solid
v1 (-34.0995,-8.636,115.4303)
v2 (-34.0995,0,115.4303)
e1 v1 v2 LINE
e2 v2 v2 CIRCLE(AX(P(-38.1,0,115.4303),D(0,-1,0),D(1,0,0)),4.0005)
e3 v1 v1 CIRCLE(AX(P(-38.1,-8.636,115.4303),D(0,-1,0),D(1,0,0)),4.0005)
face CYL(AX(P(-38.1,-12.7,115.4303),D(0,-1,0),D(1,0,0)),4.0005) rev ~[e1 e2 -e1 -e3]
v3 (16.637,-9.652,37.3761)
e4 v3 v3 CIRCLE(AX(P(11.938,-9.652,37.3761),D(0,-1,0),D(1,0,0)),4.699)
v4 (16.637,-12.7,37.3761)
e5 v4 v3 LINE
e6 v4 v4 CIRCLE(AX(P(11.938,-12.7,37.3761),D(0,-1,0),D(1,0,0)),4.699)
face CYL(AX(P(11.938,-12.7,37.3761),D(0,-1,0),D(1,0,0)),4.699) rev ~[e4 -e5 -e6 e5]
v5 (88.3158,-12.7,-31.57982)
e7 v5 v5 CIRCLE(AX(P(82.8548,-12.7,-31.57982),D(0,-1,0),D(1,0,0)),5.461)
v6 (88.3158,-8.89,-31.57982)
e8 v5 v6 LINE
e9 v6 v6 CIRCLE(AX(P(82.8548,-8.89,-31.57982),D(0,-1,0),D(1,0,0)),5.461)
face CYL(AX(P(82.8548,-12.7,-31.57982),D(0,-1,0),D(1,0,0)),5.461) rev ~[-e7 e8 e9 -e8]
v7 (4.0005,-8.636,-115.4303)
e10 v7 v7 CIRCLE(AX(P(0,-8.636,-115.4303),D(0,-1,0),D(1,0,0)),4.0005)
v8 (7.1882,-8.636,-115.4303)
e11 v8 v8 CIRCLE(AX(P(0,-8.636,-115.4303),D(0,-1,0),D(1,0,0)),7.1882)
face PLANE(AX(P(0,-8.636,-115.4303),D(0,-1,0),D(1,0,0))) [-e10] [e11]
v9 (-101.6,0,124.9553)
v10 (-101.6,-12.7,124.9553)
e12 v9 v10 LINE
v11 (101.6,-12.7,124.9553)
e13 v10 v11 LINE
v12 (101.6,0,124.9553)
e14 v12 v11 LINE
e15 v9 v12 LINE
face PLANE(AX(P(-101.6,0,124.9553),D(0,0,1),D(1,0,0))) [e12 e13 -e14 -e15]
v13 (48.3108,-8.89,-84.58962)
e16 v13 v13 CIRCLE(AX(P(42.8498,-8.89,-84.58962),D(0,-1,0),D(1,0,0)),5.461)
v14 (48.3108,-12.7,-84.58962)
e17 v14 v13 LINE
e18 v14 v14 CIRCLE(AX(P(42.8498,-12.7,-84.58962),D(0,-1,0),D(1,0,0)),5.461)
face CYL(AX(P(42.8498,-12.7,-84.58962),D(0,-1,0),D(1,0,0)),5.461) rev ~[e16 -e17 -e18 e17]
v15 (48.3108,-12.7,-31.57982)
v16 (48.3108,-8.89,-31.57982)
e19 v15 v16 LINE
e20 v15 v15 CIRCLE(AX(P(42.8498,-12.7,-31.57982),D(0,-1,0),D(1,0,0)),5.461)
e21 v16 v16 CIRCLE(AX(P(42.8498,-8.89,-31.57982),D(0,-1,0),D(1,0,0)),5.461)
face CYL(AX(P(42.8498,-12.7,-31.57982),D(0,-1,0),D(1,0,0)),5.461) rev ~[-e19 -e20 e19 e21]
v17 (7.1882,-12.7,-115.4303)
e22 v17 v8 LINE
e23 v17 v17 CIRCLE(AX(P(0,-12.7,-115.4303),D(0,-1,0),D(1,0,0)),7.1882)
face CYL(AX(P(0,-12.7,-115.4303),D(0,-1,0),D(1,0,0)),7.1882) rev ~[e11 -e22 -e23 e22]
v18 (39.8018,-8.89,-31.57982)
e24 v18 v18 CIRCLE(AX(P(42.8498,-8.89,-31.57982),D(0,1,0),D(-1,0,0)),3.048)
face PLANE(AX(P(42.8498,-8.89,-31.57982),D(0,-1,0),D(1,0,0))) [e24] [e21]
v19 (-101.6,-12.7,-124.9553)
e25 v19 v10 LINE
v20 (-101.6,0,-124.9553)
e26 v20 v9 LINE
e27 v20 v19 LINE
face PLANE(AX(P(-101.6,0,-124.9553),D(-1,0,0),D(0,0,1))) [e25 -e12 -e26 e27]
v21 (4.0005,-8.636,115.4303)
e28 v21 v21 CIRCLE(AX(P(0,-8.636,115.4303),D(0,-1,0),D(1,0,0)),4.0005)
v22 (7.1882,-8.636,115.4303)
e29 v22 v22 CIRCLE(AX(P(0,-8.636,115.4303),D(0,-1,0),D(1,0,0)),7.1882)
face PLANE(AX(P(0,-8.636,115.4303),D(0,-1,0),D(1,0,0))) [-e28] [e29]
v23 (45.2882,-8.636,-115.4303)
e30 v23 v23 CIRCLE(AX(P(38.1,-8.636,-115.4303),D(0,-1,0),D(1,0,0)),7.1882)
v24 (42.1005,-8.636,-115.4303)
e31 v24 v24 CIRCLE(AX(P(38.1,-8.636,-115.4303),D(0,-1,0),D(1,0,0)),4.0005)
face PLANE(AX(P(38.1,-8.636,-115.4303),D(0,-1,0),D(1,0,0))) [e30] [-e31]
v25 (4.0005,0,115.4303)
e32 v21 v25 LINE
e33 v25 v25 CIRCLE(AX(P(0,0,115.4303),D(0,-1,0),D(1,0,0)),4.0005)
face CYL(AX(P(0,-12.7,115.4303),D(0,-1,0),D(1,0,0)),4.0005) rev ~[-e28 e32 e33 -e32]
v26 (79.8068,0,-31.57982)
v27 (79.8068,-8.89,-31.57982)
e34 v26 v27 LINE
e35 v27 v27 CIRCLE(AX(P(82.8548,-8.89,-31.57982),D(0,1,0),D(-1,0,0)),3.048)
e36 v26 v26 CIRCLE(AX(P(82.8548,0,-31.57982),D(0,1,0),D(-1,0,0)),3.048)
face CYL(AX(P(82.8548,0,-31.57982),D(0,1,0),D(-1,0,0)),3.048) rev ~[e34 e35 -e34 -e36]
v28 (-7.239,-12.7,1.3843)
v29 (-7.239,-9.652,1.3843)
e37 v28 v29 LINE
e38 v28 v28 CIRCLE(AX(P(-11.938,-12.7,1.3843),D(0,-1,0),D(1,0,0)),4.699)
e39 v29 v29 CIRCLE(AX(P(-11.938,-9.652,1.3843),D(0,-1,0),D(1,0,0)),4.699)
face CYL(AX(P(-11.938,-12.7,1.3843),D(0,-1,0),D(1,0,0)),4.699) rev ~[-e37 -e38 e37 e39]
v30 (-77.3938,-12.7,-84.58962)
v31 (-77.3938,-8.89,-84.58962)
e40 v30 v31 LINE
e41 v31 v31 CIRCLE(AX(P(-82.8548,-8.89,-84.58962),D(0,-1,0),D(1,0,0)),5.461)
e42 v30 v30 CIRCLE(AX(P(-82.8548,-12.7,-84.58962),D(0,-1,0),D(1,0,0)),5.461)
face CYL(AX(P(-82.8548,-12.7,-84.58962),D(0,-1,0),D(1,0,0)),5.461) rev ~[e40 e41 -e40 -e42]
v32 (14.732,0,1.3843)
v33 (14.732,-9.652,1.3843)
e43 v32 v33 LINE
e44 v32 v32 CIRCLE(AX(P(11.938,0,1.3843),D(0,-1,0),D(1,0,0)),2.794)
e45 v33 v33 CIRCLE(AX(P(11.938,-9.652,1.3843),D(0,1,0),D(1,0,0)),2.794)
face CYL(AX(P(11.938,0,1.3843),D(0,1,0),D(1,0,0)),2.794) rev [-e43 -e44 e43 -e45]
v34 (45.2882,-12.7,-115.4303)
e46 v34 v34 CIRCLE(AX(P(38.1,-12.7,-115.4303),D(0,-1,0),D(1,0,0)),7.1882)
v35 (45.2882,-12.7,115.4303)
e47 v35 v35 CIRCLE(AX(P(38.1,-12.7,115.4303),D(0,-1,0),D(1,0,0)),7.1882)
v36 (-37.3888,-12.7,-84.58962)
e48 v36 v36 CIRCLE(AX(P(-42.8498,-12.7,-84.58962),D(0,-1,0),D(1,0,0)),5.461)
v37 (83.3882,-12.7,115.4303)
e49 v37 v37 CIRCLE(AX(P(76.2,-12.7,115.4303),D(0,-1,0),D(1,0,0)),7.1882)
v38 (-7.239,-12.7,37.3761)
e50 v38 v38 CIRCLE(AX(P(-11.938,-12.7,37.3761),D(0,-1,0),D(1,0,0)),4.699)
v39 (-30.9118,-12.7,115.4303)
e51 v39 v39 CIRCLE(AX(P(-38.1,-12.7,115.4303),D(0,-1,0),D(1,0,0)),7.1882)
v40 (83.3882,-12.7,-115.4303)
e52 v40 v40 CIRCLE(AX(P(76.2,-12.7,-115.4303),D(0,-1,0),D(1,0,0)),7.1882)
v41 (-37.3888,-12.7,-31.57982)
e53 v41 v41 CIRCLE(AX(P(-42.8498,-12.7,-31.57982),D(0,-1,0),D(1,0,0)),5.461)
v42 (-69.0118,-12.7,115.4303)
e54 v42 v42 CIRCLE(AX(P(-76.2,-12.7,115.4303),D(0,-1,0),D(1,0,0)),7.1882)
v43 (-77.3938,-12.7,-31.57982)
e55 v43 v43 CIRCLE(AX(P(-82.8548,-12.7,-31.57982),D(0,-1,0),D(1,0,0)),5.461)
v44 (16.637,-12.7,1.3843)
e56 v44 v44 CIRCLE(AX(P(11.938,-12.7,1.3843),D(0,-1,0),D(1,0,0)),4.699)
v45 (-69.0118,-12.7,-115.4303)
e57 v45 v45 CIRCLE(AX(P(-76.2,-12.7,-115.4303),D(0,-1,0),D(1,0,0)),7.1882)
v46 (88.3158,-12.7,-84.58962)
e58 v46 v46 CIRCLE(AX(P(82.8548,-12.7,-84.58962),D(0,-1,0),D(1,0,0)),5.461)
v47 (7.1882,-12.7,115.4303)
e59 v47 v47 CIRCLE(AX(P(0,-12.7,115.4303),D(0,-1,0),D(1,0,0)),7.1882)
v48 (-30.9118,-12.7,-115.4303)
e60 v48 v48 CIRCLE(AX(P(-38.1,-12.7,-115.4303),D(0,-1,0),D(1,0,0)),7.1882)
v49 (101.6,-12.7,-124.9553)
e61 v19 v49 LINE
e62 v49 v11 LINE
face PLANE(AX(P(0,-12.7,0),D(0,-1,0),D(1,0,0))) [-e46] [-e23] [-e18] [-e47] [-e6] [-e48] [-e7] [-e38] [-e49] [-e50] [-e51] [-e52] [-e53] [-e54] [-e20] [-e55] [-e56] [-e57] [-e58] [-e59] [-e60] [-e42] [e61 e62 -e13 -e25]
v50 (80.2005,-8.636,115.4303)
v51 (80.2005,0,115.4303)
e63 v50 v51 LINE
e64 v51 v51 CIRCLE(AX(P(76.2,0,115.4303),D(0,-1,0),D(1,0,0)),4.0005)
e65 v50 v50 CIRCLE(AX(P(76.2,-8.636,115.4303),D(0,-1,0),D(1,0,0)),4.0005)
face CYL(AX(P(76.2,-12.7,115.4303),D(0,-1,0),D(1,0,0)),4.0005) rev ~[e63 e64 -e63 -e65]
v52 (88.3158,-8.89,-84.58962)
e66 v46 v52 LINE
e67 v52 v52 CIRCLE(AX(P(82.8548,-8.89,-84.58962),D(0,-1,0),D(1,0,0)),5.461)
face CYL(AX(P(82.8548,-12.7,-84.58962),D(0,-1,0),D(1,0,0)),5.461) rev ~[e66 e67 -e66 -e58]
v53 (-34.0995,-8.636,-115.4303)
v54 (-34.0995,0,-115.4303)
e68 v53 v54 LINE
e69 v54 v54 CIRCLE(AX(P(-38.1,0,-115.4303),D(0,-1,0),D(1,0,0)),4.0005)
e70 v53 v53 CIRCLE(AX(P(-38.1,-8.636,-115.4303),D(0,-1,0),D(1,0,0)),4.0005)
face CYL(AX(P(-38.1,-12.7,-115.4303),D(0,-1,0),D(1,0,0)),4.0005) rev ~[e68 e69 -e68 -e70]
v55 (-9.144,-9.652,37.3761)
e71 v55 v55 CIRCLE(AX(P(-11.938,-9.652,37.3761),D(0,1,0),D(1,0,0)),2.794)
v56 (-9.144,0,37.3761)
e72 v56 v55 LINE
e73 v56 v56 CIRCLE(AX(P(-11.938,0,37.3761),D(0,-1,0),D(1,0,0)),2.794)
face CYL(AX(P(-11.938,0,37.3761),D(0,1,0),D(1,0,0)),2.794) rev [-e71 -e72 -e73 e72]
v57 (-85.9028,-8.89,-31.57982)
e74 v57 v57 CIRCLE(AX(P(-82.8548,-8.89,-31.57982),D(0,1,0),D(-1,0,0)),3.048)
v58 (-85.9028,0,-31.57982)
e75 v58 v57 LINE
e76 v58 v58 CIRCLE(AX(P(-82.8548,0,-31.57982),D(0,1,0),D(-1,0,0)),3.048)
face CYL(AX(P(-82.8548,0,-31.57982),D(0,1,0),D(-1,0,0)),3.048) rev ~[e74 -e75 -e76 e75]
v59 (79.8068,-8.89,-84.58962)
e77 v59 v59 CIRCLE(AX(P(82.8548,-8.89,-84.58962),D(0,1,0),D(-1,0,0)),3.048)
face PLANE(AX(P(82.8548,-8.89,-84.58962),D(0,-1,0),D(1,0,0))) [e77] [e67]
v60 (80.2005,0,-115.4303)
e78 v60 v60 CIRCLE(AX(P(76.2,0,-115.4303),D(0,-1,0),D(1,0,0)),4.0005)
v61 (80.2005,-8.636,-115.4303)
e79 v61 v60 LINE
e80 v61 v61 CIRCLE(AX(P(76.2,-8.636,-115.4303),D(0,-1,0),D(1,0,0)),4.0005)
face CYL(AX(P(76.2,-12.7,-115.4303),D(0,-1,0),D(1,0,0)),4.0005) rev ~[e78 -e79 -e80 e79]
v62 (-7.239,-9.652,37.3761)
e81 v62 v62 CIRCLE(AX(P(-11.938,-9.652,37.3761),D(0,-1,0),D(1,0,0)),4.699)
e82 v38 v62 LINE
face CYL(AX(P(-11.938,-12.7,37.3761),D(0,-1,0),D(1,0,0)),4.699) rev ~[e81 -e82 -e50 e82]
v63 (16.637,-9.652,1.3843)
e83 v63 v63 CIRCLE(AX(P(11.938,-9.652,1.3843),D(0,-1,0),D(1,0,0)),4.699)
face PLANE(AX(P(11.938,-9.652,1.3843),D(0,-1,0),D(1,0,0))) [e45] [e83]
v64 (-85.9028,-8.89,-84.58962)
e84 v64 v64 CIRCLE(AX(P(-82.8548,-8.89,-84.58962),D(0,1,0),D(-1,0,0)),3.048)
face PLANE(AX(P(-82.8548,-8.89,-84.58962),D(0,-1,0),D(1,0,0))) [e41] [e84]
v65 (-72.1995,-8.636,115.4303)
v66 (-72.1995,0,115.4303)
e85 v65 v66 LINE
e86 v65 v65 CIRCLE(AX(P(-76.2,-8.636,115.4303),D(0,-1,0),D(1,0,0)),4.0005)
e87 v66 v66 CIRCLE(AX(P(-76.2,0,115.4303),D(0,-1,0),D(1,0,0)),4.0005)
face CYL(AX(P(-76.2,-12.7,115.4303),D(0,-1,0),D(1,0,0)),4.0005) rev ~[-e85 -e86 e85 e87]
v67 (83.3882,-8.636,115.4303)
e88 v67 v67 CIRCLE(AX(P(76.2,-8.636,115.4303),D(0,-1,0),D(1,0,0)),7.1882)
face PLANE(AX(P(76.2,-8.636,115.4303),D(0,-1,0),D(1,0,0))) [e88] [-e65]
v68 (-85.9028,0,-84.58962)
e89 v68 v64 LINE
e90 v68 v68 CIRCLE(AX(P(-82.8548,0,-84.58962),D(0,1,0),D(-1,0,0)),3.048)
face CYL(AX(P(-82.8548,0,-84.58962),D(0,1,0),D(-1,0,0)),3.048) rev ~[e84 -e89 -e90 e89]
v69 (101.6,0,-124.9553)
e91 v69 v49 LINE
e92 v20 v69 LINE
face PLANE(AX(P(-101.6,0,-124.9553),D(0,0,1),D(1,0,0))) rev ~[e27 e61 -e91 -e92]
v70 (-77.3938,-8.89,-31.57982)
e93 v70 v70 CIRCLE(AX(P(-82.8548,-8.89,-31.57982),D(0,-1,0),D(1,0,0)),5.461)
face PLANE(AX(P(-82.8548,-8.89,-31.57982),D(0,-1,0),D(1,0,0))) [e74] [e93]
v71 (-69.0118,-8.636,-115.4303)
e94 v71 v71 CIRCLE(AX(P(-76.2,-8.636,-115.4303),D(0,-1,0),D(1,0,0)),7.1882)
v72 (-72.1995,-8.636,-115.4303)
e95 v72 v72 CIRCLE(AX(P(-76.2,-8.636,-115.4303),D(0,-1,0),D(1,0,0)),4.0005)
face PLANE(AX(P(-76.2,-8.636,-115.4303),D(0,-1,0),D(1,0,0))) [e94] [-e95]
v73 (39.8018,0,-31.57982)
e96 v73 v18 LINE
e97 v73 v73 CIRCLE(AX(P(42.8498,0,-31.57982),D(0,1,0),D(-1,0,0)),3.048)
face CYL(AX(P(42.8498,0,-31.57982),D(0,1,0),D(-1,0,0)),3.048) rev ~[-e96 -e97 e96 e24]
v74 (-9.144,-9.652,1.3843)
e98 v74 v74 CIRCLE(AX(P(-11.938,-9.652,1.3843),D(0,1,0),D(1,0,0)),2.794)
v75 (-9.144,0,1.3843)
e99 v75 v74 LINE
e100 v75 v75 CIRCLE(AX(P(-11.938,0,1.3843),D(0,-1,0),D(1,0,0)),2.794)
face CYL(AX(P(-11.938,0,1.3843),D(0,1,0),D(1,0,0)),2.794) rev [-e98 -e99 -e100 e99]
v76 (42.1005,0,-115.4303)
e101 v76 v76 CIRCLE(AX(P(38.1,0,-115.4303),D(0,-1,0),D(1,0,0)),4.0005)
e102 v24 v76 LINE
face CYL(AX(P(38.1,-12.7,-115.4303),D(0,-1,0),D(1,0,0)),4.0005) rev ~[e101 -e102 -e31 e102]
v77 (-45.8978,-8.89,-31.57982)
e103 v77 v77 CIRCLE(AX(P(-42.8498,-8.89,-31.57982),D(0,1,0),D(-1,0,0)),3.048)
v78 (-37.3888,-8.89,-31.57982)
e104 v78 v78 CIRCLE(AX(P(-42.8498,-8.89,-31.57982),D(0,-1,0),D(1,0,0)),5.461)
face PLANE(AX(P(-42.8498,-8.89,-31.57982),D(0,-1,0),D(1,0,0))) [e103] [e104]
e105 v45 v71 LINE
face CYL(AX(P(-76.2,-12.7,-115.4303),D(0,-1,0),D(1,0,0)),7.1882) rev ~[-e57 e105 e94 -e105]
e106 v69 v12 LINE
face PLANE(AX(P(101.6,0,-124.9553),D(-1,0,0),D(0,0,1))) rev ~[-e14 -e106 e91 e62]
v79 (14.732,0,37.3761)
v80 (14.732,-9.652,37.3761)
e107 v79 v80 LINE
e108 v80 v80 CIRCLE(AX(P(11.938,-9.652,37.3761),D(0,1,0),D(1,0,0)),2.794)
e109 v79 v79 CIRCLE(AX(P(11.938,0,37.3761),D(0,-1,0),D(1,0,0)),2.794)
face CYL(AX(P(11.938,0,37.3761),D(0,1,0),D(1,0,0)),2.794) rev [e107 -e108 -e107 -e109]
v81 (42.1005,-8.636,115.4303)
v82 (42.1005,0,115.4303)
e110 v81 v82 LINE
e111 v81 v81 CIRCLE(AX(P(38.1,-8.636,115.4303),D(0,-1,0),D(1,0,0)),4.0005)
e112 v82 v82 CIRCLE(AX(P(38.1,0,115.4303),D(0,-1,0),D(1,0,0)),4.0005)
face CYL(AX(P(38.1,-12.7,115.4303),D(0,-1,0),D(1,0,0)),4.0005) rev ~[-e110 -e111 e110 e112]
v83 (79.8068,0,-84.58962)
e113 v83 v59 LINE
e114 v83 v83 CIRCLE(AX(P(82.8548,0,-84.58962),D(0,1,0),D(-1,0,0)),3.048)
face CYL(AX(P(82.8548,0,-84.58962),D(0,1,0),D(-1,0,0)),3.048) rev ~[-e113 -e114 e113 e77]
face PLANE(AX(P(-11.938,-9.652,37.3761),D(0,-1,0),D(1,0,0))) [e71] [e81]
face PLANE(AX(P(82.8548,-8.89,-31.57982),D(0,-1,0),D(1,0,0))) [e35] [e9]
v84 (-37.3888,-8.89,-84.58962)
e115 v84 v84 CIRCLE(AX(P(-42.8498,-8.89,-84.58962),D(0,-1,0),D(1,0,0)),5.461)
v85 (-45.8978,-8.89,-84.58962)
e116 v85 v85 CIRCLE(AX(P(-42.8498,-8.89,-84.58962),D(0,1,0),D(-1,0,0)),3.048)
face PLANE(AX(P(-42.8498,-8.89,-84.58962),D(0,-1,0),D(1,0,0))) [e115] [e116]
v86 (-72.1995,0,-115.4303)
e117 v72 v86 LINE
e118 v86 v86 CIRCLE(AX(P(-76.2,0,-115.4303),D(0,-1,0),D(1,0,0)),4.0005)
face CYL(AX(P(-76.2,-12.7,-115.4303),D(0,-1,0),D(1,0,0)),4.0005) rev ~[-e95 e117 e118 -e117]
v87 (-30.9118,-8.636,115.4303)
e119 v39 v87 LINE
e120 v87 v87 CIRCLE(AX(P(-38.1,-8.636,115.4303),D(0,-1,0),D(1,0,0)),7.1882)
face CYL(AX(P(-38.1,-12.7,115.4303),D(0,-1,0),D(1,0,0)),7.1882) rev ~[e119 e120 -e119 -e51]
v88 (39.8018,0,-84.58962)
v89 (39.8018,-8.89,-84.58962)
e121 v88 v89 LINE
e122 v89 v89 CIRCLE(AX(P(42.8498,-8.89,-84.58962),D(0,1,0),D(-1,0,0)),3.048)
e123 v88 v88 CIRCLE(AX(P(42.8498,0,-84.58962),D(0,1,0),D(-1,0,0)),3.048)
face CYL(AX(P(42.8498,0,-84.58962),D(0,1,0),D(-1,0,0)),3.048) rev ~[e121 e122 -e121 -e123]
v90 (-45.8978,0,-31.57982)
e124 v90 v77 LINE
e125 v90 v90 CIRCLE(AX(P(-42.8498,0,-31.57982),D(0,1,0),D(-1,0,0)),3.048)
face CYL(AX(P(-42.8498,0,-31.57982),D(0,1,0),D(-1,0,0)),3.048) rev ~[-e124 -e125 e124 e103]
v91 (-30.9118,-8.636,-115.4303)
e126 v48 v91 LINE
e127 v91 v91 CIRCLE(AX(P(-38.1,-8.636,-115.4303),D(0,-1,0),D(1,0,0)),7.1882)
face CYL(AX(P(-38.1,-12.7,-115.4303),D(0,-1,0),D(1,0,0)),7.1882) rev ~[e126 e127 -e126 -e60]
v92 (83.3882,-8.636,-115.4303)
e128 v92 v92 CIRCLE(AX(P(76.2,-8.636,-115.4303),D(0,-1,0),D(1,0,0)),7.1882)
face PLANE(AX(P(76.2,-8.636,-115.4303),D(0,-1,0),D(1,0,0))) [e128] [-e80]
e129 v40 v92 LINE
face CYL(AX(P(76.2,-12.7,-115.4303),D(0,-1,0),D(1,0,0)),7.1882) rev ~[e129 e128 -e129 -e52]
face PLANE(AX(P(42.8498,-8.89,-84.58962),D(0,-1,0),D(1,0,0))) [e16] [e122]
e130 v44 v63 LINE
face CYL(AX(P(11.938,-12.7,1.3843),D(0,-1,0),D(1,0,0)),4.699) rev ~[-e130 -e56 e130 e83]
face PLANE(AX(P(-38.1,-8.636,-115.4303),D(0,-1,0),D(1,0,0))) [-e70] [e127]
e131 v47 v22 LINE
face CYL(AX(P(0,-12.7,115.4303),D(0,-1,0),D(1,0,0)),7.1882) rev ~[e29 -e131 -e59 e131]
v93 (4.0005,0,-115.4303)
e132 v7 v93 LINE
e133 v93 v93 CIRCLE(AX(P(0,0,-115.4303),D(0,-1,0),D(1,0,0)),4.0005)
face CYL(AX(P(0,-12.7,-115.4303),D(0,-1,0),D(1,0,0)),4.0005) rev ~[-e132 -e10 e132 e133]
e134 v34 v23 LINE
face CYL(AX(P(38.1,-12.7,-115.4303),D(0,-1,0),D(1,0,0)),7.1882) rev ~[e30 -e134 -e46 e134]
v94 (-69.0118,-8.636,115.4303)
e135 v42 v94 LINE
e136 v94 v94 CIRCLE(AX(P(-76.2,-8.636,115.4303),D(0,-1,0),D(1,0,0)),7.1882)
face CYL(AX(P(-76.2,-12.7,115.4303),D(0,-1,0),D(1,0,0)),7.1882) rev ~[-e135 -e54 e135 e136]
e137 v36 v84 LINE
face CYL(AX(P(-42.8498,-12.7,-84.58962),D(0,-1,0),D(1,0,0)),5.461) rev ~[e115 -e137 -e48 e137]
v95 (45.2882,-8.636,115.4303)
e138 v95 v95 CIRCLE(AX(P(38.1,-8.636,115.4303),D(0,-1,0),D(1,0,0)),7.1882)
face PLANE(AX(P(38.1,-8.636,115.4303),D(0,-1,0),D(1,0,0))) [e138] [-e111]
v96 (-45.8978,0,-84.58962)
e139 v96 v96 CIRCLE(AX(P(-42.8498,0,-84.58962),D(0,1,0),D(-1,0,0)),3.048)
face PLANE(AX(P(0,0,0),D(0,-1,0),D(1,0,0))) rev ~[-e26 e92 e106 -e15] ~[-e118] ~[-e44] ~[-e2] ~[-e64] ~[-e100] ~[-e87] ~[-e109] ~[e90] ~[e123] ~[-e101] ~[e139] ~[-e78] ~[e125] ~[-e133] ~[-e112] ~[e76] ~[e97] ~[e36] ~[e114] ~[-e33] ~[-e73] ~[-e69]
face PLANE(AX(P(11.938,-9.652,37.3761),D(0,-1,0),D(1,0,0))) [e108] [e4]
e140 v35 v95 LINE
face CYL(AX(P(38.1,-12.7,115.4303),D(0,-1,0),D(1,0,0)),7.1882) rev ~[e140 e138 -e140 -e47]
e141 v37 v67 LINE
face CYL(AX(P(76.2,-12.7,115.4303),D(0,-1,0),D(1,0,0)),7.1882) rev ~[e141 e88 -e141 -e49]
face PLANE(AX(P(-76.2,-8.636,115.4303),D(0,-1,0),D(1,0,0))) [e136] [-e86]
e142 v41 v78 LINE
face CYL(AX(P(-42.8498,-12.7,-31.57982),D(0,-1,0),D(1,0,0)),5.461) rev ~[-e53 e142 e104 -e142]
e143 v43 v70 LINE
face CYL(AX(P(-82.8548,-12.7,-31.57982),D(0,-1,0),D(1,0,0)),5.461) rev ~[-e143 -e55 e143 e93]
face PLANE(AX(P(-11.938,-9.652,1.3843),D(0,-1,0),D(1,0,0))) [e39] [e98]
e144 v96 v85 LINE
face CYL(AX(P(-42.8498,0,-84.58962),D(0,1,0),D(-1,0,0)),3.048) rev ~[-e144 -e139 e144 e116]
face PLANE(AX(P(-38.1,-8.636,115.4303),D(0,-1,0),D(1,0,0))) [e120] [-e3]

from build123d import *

# Parameters (mm, degrees)
F0_W      = 203.2
F0_H      = 249.9106
F0_R      = 2.794
F1_DEPTH  = 12.7
F2_R      = 4.0005
F3_DEPTH  = 12.701
F4_R      = 3.048
F5_DEPTH  = 12.701
F6_DEPTH  = 329
F7_R      = 7.1882
F8_DEPTH  = 4.064
F9_R      = 4.699
F10_DEPTH = 3.048
F11_R     = 5.461
F12_DEPTH = 3.81


# Not quite as in the source:
# - an extrude ends at something that could not be found from the text; its depth is read off the source's solid


with BuildPart() as f1:
    # F0 (on Front) → F1 (new body)
    with BuildSketch(Plane.XZ):
        Rectangle(F0_W, F0_H)
        with Locations((-11.938, 1.3843)):
            Circle(F0_R, mode=Mode.SUBTRACT)
        with Locations((-11.938, 37.3761)):
            Circle(F0_R, mode=Mode.SUBTRACT)
        with Locations((11.938, 1.3843)):
            Circle(F0_R, mode=Mode.SUBTRACT)
        with Locations((11.938, 37.3761)):
            Circle(F0_R, mode=Mode.SUBTRACT)
    extrude(amount=F1_DEPTH)

    # F2 (on face) → F3 (cut, through all)
    with BuildSketch(Plane.XZ.offset(12.7)):
        with Locations((-76.2, 115.4303)):
            Circle(F2_R)
        with Locations((-38.1, 115.4303)):
            Circle(F2_R)
        with Locations((0, 115.4303)):
            Circle(F2_R)
        with Locations((38.1, 115.4303)):
            Circle(F2_R)
        with Locations((76.2, 115.4303)):
            Circle(F2_R)
        with Locations((-76.2, -115.4303)):
            Circle(F2_R)
        with Locations((-38.1, -115.4303)):
            Circle(F2_R)
        with Locations((0, -115.4303)):
            Circle(F2_R)
        with Locations((38.1, -115.4303)):
            Circle(F2_R)
        with Locations((76.2, -115.4303)):
            Circle(F2_R)
    extrude(amount=-F3_DEPTH, mode=Mode.SUBTRACT)

    # F4 (on face) → F5 (cut, through all)
    with BuildSketch(Plane(origin=(0, 0, 0), x_dir=(-1, 0, 0), z_dir=(0, 1, 0))):
        with Locations((82.8548, -31.57982)):
            Circle(F4_R)
        with Locations((42.8498, -31.57982)):
            Circle(F4_R)
        with Locations((82.8548, -84.58962)):
            Circle(F4_R)
        with Locations((42.8498, -84.58962)):
            Circle(F4_R)
        with Locations((-42.8498, -31.57982)):
            Circle(F4_R)
        with Locations((-82.8548, -31.57982)):
            Circle(F4_R)
        with Locations((-82.8548, -84.58962)):
            Circle(F4_R)
        with Locations((-42.8498, -84.58962)):
            Circle(F4_R)
    extrude(amount=-F5_DEPTH, mode=Mode.SUBTRACT)

    # F0 (on Front) → F6 (cut, through all)
    with BuildSketch(Plane.XZ):
        Rectangle(F0_W, F0_H)
        with Locations((-11.938, 1.3843)):
            Circle(F0_R, mode=Mode.SUBTRACT)
        with Locations((-11.938, 37.3761)):
            Circle(F0_R, mode=Mode.SUBTRACT)
        with Locations((11.938, 1.3843)):
            Circle(F0_R, mode=Mode.SUBTRACT)
        with Locations((11.938, 37.3761)):
            Circle(F0_R, mode=Mode.SUBTRACT)
    extrude(amount=-F6_DEPTH, mode=Mode.SUBTRACT)

    # F7 (on face) → F8 (cut)
    with BuildSketch(Plane.XZ.offset(12.7)):
        with Locations((-76.2, -115.4303)):
            Circle(F7_R)
        with Locations((-38.1, -115.4303)):
            Circle(F7_R)
        with Locations((0, -115.4303)):
            Circle(F7_R)
        with Locations((38.1, -115.4303)):
            Circle(F7_R)
        with Locations((76.2, -115.4303)):
            Circle(F7_R)
        with Locations((-76.2, 115.4303)):
            Circle(F7_R)
        with Locations((-38.1, 115.4303)):
            Circle(F7_R)
        with Locations((0, 115.4303)):
            Circle(F7_R)
        with Locations((38.1, 115.4303)):
            Circle(F7_R)
        with Locations((76.2, 115.4303)):
            Circle(F7_R)
    extrude(amount=-F8_DEPTH, mode=Mode.SUBTRACT)

    # F9 (on face) → F10 (cut)
    with BuildSketch(Plane.XZ.offset(12.7)):
        with Locations((-11.938, 37.3761)):
            Circle(F9_R)
        with Locations((11.938, 37.3761)):
            Circle(F9_R)
        with Locations((11.938, 1.3843)):
            Circle(F9_R)
        with Locations((-11.938, 1.3843)):
            Circle(F9_R)
    extrude(amount=-F10_DEPTH, mode=Mode.SUBTRACT)

    # F11 (on face) → F12 (cut)
    with BuildSketch(Plane.XZ.offset(12.7)):
        with Locations((-82.8548, -31.57982)):
            Circle(F11_R)
        with Locations((-42.8498, -31.57982)):
            Circle(F11_R)
        with Locations((42.8498, -31.57982)):
            Circle(F11_R)
        with Locations((82.8548, -31.57982)):
            Circle(F11_R)
        with Locations((82.8548, -84.58962)):
            Circle(F11_R)
        with Locations((42.8498, -84.58962)):
            Circle(F11_R)
        with Locations((-42.8498, -84.58962)):
            Circle(F11_R)
        with Locations((-82.8548, -84.58962)):
            Circle(F11_R)
    extrude(amount=-F12_DEPTH, mode=Mode.SUBTRACT)


solid = f1.part
